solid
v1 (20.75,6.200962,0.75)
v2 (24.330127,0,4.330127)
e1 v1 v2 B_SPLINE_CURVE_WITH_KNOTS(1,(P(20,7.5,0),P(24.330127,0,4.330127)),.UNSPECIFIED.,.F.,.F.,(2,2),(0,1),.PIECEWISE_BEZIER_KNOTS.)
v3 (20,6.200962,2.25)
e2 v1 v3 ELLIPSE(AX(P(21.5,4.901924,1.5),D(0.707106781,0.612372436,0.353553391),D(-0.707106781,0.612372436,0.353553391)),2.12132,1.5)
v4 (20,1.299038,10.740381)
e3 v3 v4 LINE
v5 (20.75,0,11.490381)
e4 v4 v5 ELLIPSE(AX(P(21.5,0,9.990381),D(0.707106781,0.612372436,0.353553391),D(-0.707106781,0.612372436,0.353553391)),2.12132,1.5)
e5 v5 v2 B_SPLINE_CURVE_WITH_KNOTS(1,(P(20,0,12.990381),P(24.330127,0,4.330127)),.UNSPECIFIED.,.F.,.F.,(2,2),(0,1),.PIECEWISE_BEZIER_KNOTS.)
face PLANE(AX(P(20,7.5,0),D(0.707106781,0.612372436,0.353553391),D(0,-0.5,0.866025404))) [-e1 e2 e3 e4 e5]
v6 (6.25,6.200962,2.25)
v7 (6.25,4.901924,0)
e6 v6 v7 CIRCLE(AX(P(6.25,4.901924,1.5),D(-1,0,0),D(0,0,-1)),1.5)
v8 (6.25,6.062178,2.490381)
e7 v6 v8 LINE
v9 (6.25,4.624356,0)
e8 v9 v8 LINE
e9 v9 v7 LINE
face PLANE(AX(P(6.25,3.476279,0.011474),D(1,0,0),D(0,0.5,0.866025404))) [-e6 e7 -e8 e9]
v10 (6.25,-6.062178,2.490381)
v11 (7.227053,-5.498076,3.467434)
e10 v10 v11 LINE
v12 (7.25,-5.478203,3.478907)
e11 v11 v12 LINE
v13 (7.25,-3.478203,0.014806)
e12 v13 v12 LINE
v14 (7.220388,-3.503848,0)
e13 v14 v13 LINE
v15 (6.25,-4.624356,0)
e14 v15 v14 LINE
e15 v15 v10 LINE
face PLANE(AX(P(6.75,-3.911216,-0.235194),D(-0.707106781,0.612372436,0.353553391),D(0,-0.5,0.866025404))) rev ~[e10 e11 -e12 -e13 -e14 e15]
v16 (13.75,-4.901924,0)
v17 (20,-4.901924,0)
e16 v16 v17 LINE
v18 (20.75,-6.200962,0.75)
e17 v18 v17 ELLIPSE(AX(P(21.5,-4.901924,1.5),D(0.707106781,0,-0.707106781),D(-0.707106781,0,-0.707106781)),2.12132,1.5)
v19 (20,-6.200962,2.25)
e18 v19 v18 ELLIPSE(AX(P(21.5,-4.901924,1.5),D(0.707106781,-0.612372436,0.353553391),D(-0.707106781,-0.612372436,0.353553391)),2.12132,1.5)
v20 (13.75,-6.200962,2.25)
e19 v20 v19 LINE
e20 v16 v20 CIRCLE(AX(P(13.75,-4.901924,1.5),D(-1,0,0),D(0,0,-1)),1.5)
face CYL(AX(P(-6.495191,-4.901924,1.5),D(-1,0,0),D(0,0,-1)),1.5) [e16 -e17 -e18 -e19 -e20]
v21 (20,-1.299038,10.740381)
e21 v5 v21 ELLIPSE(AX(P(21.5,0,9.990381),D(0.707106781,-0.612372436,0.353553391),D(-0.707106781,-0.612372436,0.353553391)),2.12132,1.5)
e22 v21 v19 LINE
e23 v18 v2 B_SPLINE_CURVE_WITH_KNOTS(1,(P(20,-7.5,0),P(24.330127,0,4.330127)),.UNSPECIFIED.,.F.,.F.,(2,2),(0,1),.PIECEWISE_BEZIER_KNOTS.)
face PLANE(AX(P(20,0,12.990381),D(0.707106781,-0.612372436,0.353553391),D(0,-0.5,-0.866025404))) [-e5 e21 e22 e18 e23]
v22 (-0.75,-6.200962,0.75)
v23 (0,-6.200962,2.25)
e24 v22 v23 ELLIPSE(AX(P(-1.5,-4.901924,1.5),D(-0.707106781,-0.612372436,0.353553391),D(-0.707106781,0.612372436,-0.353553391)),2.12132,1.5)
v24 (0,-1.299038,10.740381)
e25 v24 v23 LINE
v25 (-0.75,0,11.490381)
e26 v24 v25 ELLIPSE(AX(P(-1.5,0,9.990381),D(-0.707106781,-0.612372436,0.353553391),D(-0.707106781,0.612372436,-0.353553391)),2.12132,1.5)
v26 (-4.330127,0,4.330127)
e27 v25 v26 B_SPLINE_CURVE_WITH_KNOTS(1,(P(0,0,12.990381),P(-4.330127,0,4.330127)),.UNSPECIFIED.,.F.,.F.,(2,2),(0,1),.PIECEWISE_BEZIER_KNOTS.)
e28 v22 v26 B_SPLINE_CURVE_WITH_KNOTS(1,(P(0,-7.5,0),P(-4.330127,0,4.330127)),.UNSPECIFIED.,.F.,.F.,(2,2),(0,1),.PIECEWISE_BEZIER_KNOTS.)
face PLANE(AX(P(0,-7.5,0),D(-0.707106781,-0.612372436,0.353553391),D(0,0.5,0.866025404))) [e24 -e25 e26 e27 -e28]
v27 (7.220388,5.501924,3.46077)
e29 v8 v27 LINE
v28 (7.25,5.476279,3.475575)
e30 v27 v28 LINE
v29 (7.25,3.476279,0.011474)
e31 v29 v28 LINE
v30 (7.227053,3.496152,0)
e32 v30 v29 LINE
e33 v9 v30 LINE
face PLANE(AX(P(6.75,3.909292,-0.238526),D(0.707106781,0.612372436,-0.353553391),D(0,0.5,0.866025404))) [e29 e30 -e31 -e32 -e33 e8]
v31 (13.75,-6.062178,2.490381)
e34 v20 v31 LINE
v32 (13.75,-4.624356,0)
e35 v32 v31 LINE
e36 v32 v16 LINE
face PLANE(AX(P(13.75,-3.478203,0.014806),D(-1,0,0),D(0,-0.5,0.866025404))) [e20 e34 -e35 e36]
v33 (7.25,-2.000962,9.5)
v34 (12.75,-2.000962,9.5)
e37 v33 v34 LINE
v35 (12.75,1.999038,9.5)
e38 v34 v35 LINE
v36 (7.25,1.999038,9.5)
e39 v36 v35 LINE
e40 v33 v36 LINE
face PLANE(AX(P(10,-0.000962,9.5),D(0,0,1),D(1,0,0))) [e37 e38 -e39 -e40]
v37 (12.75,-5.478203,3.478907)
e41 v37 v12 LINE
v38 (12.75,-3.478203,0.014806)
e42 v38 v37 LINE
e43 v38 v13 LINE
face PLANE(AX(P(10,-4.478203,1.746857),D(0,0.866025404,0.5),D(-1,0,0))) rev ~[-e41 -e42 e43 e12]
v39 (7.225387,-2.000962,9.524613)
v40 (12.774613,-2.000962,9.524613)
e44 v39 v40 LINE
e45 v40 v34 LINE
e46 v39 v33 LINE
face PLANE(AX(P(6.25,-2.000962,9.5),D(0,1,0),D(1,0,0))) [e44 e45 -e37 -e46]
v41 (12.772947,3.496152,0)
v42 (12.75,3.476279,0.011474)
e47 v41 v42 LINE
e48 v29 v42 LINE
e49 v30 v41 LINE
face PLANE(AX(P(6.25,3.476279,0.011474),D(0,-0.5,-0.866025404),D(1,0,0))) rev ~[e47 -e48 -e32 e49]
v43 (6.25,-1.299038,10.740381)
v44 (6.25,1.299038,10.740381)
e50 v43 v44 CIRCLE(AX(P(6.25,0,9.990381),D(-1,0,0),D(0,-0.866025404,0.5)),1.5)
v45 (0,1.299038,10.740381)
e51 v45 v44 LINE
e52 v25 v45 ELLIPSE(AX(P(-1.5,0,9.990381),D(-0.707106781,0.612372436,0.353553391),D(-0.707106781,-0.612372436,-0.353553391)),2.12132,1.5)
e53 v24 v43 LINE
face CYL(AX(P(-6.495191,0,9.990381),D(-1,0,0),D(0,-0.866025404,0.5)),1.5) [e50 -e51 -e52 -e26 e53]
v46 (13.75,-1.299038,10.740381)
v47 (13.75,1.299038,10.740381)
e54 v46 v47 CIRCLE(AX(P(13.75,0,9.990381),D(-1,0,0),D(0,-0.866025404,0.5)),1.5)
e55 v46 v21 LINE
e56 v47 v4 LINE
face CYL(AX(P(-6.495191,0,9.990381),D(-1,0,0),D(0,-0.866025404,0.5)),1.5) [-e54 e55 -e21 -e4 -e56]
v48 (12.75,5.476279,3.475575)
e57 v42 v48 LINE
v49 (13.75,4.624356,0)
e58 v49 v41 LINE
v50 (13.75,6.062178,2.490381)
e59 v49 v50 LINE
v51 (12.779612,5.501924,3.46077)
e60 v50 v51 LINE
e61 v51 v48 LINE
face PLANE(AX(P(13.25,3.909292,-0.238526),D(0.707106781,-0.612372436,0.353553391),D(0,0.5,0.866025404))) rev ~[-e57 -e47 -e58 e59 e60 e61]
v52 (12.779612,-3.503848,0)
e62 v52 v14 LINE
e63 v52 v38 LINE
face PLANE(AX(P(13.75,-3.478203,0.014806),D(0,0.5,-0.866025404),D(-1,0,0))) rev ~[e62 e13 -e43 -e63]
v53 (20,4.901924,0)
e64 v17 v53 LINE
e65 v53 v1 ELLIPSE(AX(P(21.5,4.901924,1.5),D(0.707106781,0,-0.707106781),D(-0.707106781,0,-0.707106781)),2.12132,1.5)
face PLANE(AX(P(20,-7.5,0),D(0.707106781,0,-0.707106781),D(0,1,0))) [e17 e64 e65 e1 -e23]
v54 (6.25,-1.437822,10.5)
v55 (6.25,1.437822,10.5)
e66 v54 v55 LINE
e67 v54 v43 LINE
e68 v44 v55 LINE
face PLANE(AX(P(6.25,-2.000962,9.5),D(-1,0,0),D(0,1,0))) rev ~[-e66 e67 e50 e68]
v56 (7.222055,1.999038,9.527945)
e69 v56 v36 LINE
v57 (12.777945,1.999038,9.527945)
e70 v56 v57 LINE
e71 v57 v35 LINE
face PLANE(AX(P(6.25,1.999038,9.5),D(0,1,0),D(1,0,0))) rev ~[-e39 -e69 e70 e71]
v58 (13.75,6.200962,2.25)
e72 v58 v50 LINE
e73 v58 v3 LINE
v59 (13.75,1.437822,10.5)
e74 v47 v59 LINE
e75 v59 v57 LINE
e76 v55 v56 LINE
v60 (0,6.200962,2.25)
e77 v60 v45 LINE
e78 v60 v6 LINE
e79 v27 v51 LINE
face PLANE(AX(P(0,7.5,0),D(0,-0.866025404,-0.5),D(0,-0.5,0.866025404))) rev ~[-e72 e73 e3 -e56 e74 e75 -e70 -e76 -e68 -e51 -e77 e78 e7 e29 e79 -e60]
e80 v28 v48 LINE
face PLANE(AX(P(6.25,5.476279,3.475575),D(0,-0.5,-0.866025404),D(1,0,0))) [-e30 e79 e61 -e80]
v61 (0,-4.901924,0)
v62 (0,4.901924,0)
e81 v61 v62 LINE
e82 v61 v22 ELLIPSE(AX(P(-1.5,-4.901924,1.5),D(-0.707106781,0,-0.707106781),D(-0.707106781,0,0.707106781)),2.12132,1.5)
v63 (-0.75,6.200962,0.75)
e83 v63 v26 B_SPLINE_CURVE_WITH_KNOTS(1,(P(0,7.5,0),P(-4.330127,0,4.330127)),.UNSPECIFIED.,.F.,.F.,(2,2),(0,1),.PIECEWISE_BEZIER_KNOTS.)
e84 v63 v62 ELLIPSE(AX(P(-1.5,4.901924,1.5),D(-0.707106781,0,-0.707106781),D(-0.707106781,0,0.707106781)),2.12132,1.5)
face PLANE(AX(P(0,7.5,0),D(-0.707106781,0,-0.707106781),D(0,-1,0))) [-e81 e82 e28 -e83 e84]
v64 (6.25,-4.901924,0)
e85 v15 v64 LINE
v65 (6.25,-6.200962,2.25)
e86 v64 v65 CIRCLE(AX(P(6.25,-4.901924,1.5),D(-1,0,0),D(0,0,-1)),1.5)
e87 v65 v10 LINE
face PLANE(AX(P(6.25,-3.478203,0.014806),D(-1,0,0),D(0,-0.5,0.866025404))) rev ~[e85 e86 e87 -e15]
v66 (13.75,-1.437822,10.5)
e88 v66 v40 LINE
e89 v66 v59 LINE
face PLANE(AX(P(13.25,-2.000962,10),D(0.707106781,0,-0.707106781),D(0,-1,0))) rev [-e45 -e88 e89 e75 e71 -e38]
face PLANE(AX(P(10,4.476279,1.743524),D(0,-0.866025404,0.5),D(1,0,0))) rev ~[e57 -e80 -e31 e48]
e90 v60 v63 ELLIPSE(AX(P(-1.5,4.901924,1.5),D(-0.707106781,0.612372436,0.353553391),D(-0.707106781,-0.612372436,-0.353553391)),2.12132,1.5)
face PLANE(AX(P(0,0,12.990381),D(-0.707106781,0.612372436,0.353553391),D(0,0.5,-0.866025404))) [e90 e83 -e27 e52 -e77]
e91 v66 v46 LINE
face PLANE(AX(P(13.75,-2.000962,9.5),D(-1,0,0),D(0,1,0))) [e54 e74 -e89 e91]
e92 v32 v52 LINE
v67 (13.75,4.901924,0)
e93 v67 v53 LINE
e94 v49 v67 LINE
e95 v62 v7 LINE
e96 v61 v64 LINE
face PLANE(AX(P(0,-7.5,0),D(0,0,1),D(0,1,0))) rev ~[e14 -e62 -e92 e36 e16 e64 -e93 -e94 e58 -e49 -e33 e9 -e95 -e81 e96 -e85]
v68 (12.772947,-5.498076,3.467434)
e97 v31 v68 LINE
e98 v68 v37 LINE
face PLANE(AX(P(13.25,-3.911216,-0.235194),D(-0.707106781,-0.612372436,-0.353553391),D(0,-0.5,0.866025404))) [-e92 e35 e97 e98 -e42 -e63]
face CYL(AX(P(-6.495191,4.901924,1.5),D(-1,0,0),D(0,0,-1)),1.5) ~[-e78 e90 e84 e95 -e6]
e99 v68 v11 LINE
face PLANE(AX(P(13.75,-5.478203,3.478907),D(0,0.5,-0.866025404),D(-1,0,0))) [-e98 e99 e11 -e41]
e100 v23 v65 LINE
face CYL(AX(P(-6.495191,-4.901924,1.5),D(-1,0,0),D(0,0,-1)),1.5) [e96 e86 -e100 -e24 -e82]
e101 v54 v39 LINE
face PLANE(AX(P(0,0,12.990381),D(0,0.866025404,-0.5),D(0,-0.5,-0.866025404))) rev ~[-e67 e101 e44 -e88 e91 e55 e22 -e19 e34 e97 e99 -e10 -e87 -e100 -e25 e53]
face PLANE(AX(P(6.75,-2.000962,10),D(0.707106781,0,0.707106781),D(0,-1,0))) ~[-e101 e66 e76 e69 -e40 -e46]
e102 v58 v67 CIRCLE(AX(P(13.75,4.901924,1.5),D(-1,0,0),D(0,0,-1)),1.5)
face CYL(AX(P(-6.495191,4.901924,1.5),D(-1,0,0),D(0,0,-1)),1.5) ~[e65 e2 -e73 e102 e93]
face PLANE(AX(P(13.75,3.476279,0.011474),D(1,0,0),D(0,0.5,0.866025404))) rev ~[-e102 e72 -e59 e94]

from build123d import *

# Parameters (mm, degrees)
F1_DEPTH    = 20
F4_T1_DEPTH = 32.9903810568
F6_START    = 9.5
F5_W        = 7.5
F5_H        = 4
F6_DEPTH    = 10.5
F8_START    = -9.5
F7_W        = 7.5
F7_H        = 4
F8_DEPTH    = 15.5
F10_START   = -9.5
F9_W        = 7.5
F9_H        = 4
F10_DEPTH   = 10.5
F11_SIZE    = 1


# Not quite as in the source:
# - a fillet or chamfer that OpenCascade refuses, or shapes differently, is made with other operations: its cross-section is extruded or revolved along the edge and cut away or added
# - an extrude whose draft closes it to a point is written as a loft to that point


with BuildPart() as f1:
    # F0 (on Right) → F1 (new body)
    with BuildSketch(Plane.YZ):
        Polygon((-7.5, 0), (7.5, 0), (0, 12.9903810568), align=None)
    extrude(amount=F1_DEPTH)

    # F1_face (on face) → F2 section 0
    with BuildSketch(Plane(origin=(0, 0, 4.3301270189), x_dir=(0, 1, 0), z_dir=(-1, 0, 0)), mode=Mode.PRIVATE) as f2_s0:
        Polygon((7.5, 4.3301270189), (-7.5, 4.3301270189), (0, -8.6602540378), align=None)
    loft([f2_s0.sketch, Vertex(-4.3301270189, 0, 4.3301270189)], ruled=True)

    # F1_face1 (on face) → F3 section 0
    with BuildSketch(Plane(origin=(20, 0, 4.3301270189), x_dir=(0, 1, 0), z_dir=(1, 0, 0)), mode=Mode.PRIVATE) as f3_s0:
        Polygon((-7.5, -4.3301270189), (7.5, -4.3301270189), (0, 8.6602540378), align=None)
    loft([f3_s0.sketch, Vertex(24.3301270189, 0, 4.3301270189)], ruled=True)

    # F4: fillet of radius 1.5 on 3 edges, made by hand

    # F4_s2 → F4_t1 (cut)
    with BuildSketch(Plane.YZ.offset(-6.4951905284)):
        with BuildLine():
            ThreePointArc((-1.2990381057, 10.7403810568), (0, 11.4903810568), (1.2990381057, 10.7403810568))
            Line((1.2990381057, 10.7403810568), (0, 12.9903810568))
            Line((0, 12.9903810568), (-1.2990381057, 10.7403810568))
        make_face()
        with BuildLine():
            ThreePointArc((-4.9019237886, 0), (-6.2009618943, 0.75), (-6.2009618943, 2.25))
            Line((-6.2009618943, 2.25), (-7.5, 0))
            Line((-7.5, 0), (-4.9019237886, 0))
        make_face()
        with BuildLine():
            ThreePointArc((4.9019237886, 0), (6.2009618943, 0.75), (6.2009618943, 2.25))
            Line((6.2009618943, 2.25), (7.5, 0))
            Line((7.5, 0), (4.9019237886, 0))
        make_face()
    extrude(amount=F4_T1_DEPTH, mode=Mode.SUBTRACT)

    # F5 (on Top) → F6 (cut)
    with BuildSketch(Plane.XY.offset(F6_START)):
        with Locations((10, -0.0009618943)):
            Rectangle(F5_W, F5_H)
    extrude(amount=F6_DEPTH, mode=Mode.SUBTRACT)

    # F7 (on face) → F8 (cut)
    with BuildSketch(Plane(origin=(0, -5.625, 3.2475952642), x_dir=(1, 0, 0), z_dir=(0, -0.8660254038, 0.5)).offset(F8_START)):
        with Locations((10, 3.7480762114)):
            Rectangle(F7_W, F7_H)
    extrude(amount=-F8_DEPTH, mode=Mode.SUBTRACT)

    # F9 (on face) → F10 (cut)
    with BuildSketch(Plane(origin=(0, 5.625, 3.2475952642), x_dir=(-1, 0, 0), z_dir=(0, 0.8660254038, 0.5)).offset(F10_START)):
        with Locations((-10, 3.7519237886)):
            Rectangle(F9_W, F9_H)
    extrude(amount=-F10_DEPTH, mode=Mode.SUBTRACT)

    # F11
    f11_edges = [f1.edges().sort_by_distance(p)[0] for p in [
        (6.25, 4.476279, 1.743524),
        (13.75, 4.476279, 1.743524),
        (6.25, -4.478203, 1.746857),
        (13.75, -4.478203, 1.746857),
        (6.25, -0.000962, 9.5),
        (13.75, -0.000962, 9.5),
    ]]
    chamfer(f11_edges, length=F11_SIZE)


solid = f1.part
